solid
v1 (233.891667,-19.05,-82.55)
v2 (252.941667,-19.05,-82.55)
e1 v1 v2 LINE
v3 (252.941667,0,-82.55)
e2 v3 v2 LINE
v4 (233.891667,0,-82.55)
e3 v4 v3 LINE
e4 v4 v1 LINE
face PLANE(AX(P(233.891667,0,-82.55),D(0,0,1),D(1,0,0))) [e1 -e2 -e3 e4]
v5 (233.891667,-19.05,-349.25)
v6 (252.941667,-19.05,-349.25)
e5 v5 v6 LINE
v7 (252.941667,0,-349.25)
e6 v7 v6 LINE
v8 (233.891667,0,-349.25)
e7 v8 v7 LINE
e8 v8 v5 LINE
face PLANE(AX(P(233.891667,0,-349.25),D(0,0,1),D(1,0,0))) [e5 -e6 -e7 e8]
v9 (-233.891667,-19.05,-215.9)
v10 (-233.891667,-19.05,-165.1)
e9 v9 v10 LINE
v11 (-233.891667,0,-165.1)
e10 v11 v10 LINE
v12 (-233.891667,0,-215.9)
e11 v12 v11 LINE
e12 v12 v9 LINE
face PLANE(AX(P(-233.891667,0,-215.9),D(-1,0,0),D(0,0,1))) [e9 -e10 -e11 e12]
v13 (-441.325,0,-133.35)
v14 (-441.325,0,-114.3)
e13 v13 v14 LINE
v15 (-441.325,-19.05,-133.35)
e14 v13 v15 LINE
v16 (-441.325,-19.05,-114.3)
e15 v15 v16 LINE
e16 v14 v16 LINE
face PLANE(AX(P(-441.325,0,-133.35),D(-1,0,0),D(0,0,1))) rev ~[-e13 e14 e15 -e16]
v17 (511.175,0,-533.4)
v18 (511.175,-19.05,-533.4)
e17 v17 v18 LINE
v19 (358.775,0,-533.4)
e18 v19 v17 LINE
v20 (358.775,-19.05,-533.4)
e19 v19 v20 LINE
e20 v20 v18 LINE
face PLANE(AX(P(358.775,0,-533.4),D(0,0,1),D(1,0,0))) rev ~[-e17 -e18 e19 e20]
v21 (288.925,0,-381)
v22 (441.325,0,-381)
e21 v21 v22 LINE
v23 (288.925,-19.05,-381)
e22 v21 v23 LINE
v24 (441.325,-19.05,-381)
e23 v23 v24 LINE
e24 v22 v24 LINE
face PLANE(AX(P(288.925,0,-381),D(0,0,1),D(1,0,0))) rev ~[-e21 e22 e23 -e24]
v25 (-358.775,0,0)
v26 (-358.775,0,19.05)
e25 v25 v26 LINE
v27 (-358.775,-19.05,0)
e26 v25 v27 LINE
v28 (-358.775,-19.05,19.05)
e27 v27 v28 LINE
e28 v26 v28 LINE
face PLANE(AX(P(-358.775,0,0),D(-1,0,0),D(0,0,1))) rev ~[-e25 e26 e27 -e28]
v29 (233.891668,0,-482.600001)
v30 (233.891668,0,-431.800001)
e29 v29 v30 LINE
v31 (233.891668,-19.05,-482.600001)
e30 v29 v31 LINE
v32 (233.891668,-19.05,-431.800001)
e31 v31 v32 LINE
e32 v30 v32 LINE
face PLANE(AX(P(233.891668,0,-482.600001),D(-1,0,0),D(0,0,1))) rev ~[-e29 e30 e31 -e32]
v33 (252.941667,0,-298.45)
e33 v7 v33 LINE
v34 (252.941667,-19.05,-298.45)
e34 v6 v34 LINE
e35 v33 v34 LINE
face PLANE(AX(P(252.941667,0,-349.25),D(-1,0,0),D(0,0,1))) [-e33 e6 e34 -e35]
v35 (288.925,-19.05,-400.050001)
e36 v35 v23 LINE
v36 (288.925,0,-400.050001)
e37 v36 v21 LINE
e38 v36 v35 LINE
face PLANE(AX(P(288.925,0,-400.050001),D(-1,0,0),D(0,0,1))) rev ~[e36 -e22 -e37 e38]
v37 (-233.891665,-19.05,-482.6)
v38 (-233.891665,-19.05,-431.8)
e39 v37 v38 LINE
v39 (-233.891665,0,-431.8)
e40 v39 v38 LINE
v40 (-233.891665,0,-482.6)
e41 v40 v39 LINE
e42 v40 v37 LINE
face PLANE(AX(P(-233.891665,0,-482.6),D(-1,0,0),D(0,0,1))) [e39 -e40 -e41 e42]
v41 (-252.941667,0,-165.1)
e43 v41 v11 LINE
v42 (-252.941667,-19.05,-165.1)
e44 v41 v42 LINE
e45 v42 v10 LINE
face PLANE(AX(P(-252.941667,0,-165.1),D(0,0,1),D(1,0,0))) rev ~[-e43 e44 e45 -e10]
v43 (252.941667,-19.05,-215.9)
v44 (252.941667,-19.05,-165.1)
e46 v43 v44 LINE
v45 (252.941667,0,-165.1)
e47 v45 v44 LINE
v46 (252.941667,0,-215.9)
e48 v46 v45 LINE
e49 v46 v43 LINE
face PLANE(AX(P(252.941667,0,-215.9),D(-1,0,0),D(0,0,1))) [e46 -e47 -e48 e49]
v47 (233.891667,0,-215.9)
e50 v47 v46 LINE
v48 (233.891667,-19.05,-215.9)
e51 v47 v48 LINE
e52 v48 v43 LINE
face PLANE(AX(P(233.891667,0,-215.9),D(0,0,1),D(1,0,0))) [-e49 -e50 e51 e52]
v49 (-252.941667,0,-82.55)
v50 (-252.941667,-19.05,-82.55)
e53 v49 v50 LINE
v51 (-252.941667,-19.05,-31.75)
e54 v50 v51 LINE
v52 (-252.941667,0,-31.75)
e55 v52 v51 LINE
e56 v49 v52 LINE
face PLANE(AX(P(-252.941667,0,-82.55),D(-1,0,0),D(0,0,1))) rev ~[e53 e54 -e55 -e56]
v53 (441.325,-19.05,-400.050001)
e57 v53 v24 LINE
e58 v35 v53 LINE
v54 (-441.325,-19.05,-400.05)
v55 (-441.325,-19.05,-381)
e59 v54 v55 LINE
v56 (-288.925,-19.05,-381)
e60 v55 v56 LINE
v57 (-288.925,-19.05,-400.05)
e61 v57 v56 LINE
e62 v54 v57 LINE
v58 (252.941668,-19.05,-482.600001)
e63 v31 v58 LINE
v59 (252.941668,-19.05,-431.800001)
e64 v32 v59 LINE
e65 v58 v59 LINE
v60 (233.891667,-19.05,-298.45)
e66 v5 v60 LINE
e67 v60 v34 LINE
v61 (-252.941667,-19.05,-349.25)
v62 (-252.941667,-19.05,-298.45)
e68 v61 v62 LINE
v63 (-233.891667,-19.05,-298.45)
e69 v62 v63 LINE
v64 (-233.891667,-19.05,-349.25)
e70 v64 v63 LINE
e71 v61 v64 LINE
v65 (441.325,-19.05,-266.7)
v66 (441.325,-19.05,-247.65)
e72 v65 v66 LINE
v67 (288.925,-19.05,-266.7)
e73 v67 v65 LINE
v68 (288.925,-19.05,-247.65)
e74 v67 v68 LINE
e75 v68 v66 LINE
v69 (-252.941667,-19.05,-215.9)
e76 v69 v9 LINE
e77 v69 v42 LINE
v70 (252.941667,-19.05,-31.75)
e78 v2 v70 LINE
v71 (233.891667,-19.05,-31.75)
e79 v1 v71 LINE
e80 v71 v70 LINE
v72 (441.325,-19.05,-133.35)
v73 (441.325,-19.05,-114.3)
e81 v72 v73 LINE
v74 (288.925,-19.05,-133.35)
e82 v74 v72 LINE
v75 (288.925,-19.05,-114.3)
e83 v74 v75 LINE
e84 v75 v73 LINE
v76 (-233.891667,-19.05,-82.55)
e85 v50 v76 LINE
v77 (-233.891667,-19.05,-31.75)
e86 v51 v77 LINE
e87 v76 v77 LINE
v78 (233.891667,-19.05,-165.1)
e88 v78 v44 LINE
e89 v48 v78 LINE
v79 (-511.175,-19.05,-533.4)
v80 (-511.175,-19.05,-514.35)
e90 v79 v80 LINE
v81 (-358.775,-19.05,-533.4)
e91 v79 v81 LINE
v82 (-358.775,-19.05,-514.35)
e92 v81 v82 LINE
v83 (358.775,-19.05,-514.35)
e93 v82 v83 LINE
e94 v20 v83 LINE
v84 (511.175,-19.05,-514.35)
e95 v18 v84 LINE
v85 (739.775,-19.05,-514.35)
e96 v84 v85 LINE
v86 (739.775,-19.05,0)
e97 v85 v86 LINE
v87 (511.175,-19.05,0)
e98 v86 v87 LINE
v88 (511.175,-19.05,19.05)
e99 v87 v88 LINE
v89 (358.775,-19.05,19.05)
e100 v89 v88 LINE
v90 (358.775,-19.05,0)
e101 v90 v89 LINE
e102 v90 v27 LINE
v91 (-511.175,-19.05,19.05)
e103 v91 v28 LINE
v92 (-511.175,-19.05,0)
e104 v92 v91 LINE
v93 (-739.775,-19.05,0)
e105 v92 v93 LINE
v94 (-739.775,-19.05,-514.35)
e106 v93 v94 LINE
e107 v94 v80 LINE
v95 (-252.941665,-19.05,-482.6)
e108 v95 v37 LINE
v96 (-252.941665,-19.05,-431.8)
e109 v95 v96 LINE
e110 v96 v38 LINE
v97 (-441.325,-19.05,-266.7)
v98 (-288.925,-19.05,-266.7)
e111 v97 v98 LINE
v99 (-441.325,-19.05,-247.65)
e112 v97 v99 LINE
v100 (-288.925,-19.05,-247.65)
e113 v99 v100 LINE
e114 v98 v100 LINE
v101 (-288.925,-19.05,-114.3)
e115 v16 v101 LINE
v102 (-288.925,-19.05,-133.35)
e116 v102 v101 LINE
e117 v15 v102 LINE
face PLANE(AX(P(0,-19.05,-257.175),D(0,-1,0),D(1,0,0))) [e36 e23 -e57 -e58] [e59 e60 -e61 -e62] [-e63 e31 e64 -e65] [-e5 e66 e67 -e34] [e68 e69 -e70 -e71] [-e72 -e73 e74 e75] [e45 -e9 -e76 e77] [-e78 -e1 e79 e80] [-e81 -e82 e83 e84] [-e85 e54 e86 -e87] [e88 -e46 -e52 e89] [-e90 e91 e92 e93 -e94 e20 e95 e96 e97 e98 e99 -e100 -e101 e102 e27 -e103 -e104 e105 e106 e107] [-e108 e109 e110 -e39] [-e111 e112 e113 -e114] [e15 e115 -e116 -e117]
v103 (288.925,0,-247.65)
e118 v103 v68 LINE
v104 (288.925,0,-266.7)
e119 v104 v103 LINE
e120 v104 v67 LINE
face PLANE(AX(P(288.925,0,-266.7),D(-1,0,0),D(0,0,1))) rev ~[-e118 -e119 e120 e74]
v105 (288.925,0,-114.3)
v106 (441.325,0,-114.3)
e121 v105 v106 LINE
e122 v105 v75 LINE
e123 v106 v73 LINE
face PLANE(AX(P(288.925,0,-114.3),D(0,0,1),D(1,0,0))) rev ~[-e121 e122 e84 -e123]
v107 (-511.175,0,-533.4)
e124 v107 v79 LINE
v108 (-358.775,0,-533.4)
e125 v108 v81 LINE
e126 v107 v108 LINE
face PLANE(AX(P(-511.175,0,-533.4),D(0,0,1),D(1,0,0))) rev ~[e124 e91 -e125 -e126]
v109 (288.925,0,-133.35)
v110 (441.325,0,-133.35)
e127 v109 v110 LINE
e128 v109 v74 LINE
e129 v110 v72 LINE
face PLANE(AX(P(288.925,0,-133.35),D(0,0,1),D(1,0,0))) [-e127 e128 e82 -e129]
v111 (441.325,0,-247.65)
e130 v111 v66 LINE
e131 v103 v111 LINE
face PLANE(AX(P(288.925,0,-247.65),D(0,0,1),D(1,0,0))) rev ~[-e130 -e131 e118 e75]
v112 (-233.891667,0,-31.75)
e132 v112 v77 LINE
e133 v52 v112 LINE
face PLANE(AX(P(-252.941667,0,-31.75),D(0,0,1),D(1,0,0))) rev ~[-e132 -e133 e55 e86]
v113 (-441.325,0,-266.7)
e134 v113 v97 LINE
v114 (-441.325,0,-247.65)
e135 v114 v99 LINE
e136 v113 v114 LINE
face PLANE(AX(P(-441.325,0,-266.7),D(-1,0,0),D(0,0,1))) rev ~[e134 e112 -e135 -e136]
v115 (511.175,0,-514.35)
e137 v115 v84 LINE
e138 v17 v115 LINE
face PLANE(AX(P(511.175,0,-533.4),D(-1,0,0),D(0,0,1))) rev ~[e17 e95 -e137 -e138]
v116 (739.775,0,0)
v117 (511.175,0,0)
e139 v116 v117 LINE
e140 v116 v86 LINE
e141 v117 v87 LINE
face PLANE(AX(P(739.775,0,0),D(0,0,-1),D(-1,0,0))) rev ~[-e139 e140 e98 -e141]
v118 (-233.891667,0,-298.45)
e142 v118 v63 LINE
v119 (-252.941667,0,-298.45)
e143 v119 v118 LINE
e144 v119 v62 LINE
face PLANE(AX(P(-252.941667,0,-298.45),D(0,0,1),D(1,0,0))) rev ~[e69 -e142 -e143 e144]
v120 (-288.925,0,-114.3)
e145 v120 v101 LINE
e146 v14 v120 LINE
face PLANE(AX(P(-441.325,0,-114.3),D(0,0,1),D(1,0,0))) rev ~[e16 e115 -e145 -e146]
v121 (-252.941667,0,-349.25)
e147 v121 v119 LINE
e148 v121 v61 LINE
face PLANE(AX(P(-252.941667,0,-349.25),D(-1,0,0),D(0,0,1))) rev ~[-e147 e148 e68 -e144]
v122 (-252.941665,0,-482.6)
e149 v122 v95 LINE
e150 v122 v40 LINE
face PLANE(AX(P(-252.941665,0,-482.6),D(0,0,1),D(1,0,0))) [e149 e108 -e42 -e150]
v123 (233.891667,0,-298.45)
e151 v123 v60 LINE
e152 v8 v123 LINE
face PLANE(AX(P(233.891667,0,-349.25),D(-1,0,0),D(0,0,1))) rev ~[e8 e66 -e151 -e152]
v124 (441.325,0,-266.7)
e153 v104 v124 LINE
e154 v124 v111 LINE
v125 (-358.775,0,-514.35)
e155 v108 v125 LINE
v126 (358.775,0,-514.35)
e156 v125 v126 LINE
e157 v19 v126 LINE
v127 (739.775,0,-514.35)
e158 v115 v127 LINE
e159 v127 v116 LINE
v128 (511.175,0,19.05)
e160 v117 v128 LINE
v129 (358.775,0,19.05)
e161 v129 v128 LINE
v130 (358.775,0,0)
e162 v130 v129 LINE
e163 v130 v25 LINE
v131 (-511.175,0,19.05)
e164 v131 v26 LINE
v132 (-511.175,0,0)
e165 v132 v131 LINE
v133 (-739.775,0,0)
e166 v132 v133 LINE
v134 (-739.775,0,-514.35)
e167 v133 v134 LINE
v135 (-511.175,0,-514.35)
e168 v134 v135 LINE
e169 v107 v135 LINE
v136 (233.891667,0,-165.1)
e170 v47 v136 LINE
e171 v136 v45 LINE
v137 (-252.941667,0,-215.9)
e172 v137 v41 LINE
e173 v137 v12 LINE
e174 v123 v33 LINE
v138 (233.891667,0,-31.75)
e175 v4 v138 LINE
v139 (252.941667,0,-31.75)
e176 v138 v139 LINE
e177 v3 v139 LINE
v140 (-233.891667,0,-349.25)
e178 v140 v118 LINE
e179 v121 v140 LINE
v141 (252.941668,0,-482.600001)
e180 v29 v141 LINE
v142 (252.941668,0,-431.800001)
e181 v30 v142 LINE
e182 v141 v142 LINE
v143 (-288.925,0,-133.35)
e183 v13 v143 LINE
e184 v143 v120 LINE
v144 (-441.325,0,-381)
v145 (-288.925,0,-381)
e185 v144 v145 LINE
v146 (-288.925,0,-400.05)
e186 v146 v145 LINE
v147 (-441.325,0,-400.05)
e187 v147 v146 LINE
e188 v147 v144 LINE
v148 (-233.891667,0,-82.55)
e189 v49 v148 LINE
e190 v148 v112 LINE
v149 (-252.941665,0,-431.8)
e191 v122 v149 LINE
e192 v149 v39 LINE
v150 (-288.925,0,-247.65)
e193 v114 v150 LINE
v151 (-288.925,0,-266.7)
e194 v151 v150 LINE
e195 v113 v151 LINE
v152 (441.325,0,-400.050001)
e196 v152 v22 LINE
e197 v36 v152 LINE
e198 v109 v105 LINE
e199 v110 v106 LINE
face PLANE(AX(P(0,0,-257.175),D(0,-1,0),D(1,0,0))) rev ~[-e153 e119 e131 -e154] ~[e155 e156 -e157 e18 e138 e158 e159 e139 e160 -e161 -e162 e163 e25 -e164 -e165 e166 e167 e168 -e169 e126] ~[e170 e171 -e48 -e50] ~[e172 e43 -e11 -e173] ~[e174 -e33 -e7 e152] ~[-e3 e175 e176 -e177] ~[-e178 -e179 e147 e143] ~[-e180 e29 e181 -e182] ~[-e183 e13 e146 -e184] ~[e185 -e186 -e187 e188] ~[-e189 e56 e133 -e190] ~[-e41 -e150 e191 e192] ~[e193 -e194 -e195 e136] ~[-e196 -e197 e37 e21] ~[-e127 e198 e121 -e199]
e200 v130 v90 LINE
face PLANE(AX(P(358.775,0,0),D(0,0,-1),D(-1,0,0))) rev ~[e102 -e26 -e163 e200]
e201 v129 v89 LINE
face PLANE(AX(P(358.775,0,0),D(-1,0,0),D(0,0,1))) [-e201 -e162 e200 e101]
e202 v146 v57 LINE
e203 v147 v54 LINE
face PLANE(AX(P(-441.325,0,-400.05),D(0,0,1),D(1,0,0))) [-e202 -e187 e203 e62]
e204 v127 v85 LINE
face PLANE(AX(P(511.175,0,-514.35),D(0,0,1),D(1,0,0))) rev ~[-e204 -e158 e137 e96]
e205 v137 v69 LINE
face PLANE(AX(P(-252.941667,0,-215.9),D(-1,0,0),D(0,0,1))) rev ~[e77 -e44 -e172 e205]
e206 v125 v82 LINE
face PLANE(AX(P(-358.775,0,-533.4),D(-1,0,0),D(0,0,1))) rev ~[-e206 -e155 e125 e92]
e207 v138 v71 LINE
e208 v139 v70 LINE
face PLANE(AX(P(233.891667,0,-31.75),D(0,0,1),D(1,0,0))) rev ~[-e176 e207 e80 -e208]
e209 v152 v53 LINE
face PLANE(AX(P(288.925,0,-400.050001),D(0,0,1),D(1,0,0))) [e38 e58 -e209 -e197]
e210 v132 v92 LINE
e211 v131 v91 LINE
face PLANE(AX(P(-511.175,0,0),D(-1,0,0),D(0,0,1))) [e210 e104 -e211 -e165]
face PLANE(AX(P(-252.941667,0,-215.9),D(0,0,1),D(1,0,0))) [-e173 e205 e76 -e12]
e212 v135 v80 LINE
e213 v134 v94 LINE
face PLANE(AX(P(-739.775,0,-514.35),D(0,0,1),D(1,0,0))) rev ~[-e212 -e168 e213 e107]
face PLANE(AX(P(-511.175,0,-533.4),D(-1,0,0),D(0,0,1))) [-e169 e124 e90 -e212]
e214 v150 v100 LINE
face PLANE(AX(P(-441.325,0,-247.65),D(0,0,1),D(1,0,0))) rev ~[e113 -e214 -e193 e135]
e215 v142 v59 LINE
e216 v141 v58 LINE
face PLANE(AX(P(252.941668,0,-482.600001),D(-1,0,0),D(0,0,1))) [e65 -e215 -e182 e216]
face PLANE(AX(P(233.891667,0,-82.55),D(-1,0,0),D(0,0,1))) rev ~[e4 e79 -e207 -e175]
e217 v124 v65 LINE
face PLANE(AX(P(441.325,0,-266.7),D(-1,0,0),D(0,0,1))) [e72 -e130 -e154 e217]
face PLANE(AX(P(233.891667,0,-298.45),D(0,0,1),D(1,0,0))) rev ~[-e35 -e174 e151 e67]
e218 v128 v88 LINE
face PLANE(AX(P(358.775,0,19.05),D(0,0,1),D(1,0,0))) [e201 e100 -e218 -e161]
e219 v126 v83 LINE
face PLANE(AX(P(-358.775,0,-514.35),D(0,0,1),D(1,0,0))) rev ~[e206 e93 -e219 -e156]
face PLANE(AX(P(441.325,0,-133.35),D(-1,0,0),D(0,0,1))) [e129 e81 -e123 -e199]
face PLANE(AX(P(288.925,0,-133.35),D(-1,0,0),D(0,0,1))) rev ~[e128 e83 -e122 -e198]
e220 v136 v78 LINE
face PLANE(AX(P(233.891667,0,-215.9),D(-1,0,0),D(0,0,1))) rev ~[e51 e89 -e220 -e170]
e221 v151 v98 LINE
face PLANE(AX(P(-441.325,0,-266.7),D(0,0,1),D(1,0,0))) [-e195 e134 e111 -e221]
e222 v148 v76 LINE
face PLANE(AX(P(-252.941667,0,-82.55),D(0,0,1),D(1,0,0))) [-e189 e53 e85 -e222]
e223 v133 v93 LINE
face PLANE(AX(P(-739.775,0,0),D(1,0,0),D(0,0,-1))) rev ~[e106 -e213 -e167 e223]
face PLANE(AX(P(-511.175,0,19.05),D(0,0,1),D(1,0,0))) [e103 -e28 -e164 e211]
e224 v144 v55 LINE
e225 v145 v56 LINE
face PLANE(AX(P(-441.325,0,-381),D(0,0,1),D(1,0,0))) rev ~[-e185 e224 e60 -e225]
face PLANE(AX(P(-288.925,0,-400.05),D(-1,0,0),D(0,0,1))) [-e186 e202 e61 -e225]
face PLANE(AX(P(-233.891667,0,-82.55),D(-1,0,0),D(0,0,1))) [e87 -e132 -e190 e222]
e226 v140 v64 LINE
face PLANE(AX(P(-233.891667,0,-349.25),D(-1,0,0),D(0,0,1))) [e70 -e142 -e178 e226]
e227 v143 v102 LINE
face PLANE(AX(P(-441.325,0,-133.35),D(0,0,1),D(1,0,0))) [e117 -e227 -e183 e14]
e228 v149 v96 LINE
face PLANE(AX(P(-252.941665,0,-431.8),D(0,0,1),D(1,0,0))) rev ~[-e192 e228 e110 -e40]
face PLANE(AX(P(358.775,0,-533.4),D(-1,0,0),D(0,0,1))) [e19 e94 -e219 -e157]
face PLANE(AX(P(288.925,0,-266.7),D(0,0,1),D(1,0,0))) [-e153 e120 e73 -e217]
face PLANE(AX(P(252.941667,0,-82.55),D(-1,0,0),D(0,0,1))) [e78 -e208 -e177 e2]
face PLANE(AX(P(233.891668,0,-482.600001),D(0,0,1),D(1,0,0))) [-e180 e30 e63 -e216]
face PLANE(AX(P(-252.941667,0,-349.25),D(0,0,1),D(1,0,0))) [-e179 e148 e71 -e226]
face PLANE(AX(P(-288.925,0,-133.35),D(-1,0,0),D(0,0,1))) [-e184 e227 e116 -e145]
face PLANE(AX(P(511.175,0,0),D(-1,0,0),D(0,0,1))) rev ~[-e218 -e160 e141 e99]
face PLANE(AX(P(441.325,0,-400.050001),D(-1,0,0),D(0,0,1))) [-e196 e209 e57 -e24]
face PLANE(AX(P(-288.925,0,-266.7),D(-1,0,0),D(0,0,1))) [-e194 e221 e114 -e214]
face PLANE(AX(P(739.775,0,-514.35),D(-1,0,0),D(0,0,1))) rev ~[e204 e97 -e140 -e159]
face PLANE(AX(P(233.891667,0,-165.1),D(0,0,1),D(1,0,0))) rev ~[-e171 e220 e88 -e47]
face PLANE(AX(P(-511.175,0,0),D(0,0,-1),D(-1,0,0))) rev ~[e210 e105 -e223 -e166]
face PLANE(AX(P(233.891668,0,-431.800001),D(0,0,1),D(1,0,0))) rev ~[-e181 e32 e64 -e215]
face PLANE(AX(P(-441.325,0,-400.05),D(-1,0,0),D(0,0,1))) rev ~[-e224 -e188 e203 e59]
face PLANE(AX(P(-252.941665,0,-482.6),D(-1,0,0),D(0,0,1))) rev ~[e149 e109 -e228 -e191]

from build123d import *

# Parameters (mm, degrees)
F0_W     = 19.05
F0_H     = 50.8
F0_W_2   = 152.4
F0_H_2   = 19.05
F0_H_3   = 19.0500013826
F1_DEPTH = 19.05


# Not quite as in the source:
# - a feature names something its author has since deleted; it is built from what else it names


with BuildPart() as f1:
    # F0 (on Front) → F1 (new body)
    with BuildSketch(Plane.XZ):
        Polygon((-511.175, 0), (-739.775, 0), (-739.775, -514.35), (-511.175, -514.35), (-358.775, -514.35), (358.775, -514.35), (511.175, -514.35), (739.775, -514.35), (739.775, 0), (511.175, 0), (358.775, 0), (-358.775, 0), align=None)
        with Locations((-243.4166649733, -457.2)):
            Rectangle(F0_W, F0_H, mode=Mode.SUBTRACT)
        with Locations((-365.125, -390.525)):
            Rectangle(F0_W_2, F0_H_2, mode=Mode.SUBTRACT)
        with Locations((-243.4166666497, -323.85)):
            Rectangle(F0_W, F0_H, mode=Mode.SUBTRACT)
        with Locations((-365.125, -257.175)):
            Rectangle(F0_W_2, F0_H_2, mode=Mode.SUBTRACT)
        with Locations((243.41666836, -457.2000013826)):
            Rectangle(F0_W, F0_H, mode=Mode.SUBTRACT)
        with Locations((365.125, -390.5250006913)):
            Rectangle(F0_W_2, F0_H_3, mode=Mode.SUBTRACT)
        with Locations((243.4166666836, -323.85)):
            Rectangle(F0_W, F0_H, mode=Mode.SUBTRACT)
        with Locations((365.125, -257.175)):
            Rectangle(F0_W_2, F0_H_2, mode=Mode.SUBTRACT)
        with Locations((-243.416666665, -190.5)):
            Rectangle(F0_W, F0_H, mode=Mode.SUBTRACT)
        with Locations((-365.125, -123.825)):
            Rectangle(F0_W_2, F0_H_2, mode=Mode.SUBTRACT)
        with Locations((-243.416666665, -57.15)):
            Rectangle(F0_W, F0_H, mode=Mode.SUBTRACT)
        with Locations((243.4166666684, -190.5)):
            Rectangle(F0_W, F0_H, mode=Mode.SUBTRACT)
        with Locations((365.125, -123.825)):
            Rectangle(F0_W_2, F0_H_2, mode=Mode.SUBTRACT)
        with Locations((243.4166666684, -57.15)):
            Rectangle(F0_W, F0_H, mode=Mode.SUBTRACT)
        with Locations((-434.975, 9.525)):
            Rectangle(F0_W_2, F0_H_2)
        with Locations((434.975, 9.525)):
            Rectangle(F0_W_2, F0_H_2)
        with Locations((-434.975, -523.875)):
            Rectangle(F0_W_2, F0_H_2)
        with Locations((434.975, -523.875)):
            Rectangle(F0_W_2, F0_H_2)
    extrude(amount=F1_DEPTH)


solid = f1.part
